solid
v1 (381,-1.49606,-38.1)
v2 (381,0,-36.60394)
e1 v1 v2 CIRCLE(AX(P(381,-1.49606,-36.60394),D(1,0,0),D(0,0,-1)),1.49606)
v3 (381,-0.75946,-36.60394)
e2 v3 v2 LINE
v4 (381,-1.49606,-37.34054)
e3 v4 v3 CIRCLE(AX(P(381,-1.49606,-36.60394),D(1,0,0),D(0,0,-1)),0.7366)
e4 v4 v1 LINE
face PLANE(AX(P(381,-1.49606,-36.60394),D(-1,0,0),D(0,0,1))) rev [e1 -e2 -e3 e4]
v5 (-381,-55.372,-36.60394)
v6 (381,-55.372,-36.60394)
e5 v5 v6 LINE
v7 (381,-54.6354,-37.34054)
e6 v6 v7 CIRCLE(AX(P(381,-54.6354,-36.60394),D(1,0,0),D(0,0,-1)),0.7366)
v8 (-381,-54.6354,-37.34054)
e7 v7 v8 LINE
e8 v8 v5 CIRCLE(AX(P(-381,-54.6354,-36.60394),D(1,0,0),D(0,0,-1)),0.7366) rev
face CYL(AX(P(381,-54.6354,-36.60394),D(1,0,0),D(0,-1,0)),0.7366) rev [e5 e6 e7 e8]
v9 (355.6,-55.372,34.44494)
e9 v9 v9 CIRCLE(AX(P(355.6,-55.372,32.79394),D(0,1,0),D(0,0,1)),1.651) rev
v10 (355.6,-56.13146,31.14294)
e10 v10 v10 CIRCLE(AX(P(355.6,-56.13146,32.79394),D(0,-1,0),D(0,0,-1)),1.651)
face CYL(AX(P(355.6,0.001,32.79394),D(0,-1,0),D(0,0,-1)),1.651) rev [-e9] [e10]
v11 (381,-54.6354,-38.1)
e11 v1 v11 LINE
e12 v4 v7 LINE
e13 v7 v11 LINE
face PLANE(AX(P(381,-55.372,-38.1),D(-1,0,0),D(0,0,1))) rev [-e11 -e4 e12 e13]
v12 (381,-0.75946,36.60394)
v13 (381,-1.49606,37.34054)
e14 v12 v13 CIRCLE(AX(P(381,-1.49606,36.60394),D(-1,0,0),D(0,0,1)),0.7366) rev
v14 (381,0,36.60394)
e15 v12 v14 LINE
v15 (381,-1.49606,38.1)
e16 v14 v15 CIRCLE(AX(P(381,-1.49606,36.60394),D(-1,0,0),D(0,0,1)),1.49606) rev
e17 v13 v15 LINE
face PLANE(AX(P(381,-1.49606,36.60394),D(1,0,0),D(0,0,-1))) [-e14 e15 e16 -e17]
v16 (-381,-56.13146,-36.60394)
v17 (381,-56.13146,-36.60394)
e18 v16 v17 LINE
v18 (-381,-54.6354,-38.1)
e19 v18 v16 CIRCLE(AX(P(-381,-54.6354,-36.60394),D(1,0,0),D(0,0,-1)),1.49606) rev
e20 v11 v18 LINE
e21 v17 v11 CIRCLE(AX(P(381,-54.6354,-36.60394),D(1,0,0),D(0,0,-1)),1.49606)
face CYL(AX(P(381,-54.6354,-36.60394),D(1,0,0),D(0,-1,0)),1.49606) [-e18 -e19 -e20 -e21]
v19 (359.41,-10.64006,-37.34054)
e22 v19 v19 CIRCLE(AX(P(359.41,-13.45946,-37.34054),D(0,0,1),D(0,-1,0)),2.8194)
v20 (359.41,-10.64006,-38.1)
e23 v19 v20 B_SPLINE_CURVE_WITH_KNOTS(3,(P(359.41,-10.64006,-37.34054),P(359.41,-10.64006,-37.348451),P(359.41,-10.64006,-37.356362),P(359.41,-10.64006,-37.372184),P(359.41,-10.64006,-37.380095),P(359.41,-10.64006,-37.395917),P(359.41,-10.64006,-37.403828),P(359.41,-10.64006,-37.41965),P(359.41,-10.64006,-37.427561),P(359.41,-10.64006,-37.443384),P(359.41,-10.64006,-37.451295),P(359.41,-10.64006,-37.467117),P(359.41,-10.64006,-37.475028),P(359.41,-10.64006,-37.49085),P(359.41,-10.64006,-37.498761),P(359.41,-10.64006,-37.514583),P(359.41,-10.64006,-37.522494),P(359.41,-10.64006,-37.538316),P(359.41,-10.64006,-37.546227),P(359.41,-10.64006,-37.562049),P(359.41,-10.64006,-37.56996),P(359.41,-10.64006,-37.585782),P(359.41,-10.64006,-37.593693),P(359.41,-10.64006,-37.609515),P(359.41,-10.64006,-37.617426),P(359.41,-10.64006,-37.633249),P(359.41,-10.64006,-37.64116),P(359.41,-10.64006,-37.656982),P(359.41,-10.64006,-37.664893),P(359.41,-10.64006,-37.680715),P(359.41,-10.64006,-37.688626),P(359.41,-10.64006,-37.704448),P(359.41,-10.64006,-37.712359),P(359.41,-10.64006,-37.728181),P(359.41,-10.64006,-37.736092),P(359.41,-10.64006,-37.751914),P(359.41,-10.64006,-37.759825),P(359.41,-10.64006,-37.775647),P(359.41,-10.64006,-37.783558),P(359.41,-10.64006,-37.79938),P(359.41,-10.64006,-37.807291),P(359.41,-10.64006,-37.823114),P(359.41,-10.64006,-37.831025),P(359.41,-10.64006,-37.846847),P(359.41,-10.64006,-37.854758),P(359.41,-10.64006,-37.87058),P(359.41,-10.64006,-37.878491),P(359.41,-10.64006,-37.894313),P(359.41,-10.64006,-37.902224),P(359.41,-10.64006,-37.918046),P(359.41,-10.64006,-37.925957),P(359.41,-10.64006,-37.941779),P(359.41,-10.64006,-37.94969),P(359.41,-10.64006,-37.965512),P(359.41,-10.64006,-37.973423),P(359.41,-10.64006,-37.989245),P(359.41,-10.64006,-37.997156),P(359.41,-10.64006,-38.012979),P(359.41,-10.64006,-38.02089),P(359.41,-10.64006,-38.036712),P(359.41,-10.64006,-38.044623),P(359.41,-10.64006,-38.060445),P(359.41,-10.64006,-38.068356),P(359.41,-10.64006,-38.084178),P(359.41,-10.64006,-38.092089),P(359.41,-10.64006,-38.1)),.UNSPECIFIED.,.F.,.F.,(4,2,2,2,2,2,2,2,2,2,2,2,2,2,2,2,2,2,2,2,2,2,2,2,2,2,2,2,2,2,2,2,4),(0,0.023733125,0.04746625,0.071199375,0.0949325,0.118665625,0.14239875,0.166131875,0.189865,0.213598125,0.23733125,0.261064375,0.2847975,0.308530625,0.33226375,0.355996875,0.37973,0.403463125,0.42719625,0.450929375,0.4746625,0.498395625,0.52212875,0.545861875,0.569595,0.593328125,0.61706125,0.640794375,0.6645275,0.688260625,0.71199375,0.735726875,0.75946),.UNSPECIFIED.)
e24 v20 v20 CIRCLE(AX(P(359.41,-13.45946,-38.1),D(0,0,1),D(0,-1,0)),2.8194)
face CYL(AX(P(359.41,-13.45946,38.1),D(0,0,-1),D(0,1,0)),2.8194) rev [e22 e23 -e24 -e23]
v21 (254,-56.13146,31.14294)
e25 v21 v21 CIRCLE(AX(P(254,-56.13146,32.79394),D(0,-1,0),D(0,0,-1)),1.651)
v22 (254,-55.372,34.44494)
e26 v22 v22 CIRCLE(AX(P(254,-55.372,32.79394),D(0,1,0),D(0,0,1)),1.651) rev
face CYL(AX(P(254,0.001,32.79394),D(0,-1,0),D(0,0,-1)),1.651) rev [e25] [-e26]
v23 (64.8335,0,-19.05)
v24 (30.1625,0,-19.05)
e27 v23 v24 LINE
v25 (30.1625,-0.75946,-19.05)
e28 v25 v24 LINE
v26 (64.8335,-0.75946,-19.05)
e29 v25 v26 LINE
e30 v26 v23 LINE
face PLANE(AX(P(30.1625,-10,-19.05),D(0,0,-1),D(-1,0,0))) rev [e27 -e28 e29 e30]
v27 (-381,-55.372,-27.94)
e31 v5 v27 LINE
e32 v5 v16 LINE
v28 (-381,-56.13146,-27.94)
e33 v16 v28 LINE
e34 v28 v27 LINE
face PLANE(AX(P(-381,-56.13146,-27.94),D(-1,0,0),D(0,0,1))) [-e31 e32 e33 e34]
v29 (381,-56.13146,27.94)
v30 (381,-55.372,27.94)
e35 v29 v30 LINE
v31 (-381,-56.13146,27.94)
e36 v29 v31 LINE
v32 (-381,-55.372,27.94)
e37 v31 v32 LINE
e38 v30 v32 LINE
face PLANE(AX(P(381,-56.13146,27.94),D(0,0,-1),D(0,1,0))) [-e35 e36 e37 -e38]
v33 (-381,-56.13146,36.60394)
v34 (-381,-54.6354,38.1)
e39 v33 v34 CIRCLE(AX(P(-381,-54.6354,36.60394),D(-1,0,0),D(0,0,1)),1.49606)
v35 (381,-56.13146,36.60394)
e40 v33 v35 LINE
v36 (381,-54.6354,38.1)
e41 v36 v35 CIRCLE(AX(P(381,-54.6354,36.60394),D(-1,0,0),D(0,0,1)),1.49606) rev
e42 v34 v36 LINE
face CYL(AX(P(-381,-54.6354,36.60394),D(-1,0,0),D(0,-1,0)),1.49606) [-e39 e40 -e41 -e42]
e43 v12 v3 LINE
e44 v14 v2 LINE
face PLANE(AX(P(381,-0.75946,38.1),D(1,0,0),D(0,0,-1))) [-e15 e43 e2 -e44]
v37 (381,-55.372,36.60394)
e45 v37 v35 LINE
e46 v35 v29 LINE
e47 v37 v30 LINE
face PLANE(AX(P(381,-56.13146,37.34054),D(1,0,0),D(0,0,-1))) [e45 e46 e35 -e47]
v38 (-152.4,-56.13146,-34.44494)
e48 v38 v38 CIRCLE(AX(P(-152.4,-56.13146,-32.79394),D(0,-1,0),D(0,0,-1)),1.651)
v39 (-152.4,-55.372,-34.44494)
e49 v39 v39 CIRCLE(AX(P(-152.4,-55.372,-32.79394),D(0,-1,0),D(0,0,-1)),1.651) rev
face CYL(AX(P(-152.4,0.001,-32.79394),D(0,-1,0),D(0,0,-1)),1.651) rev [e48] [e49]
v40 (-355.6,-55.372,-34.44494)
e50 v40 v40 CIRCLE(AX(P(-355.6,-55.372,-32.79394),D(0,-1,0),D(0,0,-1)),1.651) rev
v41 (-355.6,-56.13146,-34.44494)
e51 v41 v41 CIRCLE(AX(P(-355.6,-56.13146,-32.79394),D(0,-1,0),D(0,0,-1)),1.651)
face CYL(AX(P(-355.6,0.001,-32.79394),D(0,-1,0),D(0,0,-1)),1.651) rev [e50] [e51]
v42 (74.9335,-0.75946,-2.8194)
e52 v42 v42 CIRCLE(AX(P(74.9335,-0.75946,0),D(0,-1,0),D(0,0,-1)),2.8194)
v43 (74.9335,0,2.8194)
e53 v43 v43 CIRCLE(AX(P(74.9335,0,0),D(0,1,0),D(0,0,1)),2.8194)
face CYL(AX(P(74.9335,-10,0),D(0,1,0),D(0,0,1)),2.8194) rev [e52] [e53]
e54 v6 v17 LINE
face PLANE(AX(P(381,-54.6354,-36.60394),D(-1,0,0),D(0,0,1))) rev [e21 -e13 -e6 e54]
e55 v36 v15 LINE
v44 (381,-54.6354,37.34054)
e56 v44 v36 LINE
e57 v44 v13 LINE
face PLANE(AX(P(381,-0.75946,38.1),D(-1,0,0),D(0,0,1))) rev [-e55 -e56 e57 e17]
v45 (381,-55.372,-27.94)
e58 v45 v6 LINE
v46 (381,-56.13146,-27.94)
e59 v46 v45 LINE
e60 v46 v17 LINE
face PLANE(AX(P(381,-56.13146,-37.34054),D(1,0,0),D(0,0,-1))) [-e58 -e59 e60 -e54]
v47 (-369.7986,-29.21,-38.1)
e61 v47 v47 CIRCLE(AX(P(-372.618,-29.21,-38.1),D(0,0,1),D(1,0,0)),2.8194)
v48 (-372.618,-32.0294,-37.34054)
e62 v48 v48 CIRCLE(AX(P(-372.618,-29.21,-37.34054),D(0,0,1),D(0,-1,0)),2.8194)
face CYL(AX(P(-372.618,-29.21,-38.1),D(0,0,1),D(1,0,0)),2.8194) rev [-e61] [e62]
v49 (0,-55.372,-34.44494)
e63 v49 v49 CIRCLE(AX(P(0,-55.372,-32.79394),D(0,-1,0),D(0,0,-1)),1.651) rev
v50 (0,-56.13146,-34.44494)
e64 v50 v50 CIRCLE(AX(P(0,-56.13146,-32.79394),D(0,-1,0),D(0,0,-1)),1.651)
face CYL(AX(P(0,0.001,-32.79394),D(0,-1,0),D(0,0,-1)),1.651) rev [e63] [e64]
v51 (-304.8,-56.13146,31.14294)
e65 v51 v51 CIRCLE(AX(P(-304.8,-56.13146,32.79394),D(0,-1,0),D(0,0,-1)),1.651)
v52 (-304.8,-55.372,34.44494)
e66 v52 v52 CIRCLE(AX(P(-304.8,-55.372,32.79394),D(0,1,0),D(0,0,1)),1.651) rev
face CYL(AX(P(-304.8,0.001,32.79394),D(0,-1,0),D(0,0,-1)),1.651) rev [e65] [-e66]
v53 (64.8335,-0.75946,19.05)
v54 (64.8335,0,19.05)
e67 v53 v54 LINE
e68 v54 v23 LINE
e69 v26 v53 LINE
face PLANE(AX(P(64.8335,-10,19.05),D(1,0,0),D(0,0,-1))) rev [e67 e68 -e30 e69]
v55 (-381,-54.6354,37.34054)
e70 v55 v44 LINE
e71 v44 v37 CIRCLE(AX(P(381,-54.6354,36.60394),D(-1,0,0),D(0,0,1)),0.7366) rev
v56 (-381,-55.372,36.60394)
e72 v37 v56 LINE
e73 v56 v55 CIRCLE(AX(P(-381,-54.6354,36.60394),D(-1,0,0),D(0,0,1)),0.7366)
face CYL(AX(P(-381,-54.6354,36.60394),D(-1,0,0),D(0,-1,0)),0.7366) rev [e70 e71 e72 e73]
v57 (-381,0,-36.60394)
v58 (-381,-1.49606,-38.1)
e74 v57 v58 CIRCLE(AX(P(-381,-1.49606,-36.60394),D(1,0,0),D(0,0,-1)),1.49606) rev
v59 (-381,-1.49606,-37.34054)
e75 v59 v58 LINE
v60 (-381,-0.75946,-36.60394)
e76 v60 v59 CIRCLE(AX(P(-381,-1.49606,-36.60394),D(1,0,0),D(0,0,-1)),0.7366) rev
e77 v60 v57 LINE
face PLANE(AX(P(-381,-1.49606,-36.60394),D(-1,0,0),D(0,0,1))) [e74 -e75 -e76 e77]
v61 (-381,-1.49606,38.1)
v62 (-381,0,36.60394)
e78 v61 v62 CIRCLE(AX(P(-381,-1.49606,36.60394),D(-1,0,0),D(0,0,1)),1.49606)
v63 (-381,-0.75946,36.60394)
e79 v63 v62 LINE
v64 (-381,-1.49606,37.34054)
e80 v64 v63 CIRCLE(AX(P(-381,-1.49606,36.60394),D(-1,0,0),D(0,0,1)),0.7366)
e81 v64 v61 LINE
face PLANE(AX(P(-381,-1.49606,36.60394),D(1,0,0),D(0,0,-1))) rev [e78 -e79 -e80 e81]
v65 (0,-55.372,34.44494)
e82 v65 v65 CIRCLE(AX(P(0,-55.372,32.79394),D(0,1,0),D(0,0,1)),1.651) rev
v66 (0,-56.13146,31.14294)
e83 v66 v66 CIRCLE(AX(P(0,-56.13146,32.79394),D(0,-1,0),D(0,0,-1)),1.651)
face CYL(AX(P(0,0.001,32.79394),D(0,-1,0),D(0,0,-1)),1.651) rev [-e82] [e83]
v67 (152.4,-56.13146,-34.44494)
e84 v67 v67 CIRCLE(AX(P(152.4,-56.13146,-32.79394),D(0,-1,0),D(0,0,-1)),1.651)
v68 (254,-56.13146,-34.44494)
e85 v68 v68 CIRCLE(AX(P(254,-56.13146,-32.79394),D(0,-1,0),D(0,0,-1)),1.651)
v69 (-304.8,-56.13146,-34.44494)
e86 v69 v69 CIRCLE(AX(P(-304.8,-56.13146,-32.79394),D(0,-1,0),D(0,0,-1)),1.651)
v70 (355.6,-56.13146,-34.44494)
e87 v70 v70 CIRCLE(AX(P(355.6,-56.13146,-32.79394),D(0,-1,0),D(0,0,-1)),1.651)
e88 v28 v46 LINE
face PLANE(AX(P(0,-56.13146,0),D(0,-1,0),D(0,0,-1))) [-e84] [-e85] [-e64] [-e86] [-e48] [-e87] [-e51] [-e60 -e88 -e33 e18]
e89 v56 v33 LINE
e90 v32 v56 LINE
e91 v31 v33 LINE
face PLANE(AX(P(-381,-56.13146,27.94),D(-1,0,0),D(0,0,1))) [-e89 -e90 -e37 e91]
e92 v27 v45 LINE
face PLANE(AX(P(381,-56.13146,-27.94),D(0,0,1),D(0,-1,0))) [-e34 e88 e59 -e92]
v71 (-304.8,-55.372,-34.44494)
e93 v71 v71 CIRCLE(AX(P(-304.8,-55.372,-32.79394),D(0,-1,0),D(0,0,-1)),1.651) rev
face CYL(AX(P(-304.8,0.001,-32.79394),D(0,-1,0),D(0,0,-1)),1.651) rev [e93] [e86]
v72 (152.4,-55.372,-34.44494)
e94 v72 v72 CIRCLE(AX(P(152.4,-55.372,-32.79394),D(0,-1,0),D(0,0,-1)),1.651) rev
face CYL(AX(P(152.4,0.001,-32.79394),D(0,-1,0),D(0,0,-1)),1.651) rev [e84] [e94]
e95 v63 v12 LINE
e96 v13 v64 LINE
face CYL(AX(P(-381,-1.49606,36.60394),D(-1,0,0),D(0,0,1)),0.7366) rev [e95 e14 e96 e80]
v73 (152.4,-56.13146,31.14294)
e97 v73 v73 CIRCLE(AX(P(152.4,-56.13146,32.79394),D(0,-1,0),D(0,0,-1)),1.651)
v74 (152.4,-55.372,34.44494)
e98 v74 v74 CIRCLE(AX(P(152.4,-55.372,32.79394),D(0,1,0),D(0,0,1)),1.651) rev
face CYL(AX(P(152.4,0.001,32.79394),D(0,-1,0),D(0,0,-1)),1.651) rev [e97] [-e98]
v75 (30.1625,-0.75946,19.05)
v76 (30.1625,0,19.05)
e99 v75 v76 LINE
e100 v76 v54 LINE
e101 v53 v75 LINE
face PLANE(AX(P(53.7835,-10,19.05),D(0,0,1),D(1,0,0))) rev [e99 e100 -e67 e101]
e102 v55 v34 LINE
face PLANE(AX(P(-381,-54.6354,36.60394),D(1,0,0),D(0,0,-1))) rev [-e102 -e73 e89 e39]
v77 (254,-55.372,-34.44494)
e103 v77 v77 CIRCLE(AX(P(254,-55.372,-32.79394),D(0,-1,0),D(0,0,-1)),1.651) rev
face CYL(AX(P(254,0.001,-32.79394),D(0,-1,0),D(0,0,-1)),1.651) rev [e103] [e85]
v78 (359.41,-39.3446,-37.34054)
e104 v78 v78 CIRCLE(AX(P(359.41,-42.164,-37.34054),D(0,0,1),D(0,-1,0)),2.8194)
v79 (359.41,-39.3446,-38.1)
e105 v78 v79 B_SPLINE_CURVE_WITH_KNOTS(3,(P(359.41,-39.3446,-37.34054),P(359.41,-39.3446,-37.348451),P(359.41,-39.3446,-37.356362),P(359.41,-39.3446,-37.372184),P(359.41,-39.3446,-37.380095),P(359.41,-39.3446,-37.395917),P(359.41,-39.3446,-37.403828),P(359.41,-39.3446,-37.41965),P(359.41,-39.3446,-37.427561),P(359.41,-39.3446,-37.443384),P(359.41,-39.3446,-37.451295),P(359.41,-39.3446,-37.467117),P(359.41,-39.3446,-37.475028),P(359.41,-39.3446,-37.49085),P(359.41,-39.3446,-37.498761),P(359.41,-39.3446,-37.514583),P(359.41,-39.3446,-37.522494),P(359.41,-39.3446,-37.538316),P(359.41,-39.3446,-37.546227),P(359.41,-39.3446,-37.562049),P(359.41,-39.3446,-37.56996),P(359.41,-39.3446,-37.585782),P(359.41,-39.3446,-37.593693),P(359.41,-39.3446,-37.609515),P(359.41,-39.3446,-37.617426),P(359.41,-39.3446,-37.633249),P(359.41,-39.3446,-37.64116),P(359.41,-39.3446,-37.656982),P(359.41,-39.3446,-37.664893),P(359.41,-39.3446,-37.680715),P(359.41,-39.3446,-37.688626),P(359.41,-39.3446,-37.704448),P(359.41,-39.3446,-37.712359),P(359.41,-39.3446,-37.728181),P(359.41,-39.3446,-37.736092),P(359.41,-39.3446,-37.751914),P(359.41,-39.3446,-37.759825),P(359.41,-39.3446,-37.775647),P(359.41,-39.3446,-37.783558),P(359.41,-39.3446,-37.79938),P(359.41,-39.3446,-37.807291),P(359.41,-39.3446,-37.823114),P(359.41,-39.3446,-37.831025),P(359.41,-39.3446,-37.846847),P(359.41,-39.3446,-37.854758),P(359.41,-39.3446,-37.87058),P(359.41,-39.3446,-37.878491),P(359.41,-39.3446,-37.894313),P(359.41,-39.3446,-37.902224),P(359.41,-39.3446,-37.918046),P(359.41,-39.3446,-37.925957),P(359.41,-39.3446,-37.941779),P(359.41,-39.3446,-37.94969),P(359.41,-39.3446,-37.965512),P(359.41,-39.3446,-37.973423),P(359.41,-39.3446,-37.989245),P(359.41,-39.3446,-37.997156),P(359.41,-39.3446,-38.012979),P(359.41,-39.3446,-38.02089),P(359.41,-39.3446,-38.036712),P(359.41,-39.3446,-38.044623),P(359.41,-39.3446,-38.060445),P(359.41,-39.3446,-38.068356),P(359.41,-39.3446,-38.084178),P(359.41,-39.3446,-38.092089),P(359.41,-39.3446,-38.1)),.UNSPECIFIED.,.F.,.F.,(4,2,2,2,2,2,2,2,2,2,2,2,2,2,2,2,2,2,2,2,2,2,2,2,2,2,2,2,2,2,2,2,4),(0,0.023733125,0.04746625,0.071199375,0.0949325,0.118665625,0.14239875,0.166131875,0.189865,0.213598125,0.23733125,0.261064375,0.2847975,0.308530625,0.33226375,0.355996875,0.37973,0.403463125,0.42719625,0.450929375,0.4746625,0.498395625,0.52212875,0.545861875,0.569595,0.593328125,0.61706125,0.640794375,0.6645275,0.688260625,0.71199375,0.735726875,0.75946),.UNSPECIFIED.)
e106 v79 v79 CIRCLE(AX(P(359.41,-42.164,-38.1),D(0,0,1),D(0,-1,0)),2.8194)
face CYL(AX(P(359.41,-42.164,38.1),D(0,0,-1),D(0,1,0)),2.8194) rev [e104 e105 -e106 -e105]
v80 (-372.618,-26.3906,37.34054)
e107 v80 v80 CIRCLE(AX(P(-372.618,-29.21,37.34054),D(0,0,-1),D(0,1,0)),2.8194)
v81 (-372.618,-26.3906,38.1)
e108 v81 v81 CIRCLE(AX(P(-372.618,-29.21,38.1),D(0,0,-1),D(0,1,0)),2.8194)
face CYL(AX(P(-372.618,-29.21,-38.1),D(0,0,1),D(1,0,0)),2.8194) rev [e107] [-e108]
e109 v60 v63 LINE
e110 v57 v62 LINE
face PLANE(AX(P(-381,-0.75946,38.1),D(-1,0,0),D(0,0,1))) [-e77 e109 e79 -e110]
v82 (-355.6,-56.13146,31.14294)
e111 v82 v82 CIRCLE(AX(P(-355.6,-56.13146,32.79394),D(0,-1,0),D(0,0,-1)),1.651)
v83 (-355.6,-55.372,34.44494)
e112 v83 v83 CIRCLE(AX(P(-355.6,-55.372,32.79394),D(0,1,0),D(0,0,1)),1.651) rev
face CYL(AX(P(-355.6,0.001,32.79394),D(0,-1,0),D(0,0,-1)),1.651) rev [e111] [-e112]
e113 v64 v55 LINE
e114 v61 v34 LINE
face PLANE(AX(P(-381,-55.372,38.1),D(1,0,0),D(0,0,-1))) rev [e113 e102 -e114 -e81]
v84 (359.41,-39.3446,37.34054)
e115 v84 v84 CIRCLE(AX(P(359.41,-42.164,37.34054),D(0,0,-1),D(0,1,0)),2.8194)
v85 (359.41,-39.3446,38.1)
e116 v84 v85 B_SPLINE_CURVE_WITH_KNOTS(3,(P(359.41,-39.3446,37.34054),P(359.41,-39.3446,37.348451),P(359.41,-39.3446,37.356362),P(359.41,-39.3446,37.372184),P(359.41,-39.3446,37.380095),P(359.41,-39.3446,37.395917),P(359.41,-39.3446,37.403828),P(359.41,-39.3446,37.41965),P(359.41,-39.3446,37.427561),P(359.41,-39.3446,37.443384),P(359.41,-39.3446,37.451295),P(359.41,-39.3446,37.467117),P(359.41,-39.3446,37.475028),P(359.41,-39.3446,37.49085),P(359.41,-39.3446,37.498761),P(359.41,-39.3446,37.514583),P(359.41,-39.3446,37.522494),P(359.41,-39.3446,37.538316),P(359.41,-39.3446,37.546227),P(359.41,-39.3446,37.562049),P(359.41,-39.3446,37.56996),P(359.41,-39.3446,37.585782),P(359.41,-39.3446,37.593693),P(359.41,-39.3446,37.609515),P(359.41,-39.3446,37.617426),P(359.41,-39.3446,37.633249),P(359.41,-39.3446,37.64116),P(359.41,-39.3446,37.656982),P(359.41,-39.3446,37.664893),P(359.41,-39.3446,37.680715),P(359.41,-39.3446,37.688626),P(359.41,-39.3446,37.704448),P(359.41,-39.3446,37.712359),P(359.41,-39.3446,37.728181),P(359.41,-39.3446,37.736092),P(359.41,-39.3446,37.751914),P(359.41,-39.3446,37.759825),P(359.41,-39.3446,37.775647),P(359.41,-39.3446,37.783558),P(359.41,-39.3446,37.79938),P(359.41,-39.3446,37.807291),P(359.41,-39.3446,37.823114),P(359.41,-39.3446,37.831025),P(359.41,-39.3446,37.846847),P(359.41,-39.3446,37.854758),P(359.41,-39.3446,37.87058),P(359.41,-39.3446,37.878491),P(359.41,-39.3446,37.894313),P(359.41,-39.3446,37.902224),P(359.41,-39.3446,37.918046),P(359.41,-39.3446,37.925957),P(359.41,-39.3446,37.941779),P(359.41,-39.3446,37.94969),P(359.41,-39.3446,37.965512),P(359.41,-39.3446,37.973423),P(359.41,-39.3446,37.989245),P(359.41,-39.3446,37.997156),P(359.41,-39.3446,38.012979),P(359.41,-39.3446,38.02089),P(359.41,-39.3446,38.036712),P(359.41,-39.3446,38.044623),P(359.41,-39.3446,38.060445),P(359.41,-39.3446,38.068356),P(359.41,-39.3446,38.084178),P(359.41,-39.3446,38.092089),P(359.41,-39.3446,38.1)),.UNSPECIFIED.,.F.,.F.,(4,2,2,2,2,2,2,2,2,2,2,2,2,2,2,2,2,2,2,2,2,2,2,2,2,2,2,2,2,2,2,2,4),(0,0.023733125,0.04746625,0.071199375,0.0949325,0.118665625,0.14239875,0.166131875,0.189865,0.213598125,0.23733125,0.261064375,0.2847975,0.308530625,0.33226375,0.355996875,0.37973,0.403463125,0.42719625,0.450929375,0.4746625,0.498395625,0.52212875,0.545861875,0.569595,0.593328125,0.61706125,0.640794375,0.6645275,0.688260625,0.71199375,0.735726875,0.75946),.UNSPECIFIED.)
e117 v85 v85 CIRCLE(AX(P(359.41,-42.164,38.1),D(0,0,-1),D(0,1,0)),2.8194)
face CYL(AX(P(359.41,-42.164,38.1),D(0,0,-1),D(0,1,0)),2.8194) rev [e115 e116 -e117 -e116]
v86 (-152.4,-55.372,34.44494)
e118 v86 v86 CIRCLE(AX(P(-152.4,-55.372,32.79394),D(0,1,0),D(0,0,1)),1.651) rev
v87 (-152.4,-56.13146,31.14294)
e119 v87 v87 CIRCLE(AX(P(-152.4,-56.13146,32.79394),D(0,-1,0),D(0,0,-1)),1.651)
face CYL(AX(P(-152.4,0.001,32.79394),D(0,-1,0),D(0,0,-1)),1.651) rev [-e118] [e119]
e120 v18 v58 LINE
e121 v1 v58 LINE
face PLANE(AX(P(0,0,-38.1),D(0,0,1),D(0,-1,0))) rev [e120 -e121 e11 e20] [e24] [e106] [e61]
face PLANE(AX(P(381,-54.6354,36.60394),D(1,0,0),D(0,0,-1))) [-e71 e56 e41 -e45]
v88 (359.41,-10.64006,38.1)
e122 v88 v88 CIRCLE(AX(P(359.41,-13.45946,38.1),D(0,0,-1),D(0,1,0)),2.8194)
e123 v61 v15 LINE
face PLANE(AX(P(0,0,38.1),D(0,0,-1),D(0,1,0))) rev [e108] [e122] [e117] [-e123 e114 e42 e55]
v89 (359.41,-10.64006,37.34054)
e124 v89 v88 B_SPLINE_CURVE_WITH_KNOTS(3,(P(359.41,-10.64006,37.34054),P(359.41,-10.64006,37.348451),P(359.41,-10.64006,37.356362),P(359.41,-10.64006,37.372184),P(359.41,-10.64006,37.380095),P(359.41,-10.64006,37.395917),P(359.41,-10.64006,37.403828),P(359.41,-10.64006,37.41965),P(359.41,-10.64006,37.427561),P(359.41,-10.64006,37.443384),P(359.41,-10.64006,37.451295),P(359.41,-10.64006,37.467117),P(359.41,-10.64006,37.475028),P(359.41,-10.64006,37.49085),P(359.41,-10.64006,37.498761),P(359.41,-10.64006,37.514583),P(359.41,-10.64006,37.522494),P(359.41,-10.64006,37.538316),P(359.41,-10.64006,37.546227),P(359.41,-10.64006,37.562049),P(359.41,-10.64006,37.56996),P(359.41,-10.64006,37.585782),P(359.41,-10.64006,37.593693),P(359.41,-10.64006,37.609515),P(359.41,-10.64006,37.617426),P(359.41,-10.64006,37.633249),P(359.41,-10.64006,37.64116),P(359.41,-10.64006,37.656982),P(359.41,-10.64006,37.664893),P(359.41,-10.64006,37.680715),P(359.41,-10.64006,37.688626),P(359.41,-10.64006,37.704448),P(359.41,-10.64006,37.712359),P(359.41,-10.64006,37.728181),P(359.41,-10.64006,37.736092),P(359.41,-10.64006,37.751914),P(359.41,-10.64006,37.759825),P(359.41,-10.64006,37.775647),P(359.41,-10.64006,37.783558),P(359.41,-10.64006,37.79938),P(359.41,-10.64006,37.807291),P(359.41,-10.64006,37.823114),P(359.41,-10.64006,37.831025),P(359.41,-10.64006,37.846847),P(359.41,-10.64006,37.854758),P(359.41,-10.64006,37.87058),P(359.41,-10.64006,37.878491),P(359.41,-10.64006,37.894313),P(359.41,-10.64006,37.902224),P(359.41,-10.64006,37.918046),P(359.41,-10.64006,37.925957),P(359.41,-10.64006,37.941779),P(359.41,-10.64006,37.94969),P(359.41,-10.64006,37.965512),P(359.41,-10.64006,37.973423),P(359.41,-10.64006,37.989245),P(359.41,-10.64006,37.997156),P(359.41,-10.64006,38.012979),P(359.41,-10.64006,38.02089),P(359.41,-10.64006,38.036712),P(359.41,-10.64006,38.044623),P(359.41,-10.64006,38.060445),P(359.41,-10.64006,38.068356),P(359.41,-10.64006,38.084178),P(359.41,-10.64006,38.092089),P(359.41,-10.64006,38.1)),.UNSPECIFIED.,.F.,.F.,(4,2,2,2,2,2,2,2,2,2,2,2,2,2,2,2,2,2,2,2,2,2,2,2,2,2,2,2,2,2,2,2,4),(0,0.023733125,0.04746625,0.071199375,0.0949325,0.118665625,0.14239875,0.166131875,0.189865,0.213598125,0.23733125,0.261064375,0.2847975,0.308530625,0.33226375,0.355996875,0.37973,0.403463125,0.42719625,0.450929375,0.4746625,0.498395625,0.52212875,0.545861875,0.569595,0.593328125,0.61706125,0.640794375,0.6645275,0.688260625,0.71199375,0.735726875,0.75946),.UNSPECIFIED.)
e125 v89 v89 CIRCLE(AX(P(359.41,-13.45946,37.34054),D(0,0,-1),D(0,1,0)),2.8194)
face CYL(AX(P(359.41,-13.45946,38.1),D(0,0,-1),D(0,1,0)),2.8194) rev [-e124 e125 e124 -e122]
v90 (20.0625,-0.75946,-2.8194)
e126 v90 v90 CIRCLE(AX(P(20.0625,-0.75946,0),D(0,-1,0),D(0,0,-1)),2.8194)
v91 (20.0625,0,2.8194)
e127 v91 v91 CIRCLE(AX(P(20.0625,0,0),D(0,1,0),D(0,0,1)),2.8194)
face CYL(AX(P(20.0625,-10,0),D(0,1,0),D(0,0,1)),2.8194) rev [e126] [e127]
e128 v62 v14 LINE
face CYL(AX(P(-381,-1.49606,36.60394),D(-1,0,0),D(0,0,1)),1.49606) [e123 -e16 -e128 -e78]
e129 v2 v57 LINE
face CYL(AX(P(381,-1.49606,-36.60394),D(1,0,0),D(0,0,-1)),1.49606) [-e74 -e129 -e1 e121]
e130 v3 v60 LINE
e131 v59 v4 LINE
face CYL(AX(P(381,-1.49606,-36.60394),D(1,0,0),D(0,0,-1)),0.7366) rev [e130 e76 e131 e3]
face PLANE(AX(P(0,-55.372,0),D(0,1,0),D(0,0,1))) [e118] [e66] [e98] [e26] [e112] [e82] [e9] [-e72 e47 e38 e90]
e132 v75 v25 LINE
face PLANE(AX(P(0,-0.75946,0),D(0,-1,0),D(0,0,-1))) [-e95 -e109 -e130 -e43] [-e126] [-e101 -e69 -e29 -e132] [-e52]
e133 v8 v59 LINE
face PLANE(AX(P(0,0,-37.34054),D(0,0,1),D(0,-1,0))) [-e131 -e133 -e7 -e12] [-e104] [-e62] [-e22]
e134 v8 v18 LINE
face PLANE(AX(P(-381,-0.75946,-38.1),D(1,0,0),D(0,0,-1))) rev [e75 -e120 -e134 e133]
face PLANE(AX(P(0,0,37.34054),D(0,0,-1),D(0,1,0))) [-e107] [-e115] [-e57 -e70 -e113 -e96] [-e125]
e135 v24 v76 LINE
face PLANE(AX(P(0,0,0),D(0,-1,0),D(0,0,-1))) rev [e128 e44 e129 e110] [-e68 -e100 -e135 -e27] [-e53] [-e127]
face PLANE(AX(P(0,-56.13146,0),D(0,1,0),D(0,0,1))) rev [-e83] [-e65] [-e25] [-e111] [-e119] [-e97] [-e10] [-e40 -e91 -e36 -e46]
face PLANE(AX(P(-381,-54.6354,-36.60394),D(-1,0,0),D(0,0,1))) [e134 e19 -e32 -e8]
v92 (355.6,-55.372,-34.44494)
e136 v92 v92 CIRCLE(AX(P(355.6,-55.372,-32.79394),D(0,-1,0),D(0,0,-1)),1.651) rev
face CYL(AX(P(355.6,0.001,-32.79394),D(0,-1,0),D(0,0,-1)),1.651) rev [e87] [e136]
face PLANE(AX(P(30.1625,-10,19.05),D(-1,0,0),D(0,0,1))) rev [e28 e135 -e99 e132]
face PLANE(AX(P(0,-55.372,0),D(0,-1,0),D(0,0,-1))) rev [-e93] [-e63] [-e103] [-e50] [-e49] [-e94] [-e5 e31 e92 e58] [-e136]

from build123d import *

# Parameters (mm, degrees)
SKETCH1_W                      = 762
SKETCH1_H                      = 76.2
BASE_FLANGE1_DEPTH             = 0.75946
CUT_EXTRUDE1_DEPTH             = 10
SKETCH7_R                      = 2.8194
CUT_EXTRUDE2_DEPTH             = 10
EDGE_FLANGE1_STRIP_W           = 4.51104
EDGE_FLANGE1_STRIP_H           = 0.75946
EDGE_FLANGE1_STRIP_CUT_DEPTH   = 762
EDGE_FLANGE1_STRIP_2_W         = 4.51104
EDGE_FLANGE1_STRIP_2_H         = 0.75946
EDGE_FLANGE1_STRIP_CUT_2_DEPTH = 762
EDGE_FLANGE1_DEPTH             = 762
EDGE_FLANGE1_BEND_DEPTH        = 762
CUT_EXTRUDE4_DEPTH             = 393.47101598
CUT_EXTRUDE4_DEPTH_BACK        = 393.47101598
SKETCH42_R                     = 2.8194
EDGE_FLANGE2_STRIP_W           = 4.51104
EDGE_FLANGE2_STRIP_H           = 0.75946
EDGE_FLANGE2_STRIP_CUT_DEPTH   = 762
EDGE_FLANGE2_STRIP_2_W         = 4.51104
EDGE_FLANGE2_STRIP_2_H         = 0.75946
EDGE_FLANGE2_STRIP_CUT_2_DEPTH = 762
EDGE_FLANGE2_DEPTH             = 762
EDGE_FLANGE2_BEND_DEPTH        = 762
CUT_EXTRUDE5_REACH             = 388.993
SKETCH49_R                     = 1.651
CUT_EXTRUDE6_DEPTH             = 393.578884814
CUT_EXTRUDE6_DEPTH_BACK        = 393.578884814
SKETCH50_R                     = 2.8194


# Sheet-metal steps are written as plain solids
with BuildPart() as part:
    # Sketch1 → Base-Flange1 (new body)
    with BuildSketch(Plane(origin=(0, 0, 0), x_dir=(1, 0, 0), z_dir=(0, 1, 0))):
        Rectangle(SKETCH1_W, SKETCH1_H)
    extrude(amount=-BASE_FLANGE1_DEPTH)

    # Sketch6 → Cut-Extrude1 (cut)
    with BuildSketch(Plane(origin=(0, 0, 0), x_dir=(1, 0, 0), z_dir=(0, 1, 0))):
        Polygon((53.7835, 19.05), (64.8335, 19.05), (64.8335, -19.05), (53.7835, -19.05), (30.1625, -19.05), (30.1625, 19.05), align=None)
    extrude(amount=-CUT_EXTRUDE1_DEPTH, mode=Mode.SUBTRACT)

    # Sketch7 → Cut-Extrude2 (cut)
    with BuildSketch(Plane(origin=(0, 0, 0), x_dir=(1, 0, 0), z_dir=(0, 1, 0))):
        with Locations(Location((20.0625, 0, 0), (0, 0, 270))):
            Circle(SKETCH7_R)
        with Locations(Location((74.9335, 0, 0), (0, 0, 270))):
            Circle(SKETCH7_R)
    extrude(amount=-CUT_EXTRUDE2_DEPTH, mode=Mode.SUBTRACT)

    # Edge-Flange1 strip (across the edge) → Edge-Flange1 strip cut (cut)
    with BuildSketch(Plane(origin=(-381, -0.75946, -38.1), x_dir=(0, 0, 1), z_dir=(1, 0, 0))):
        with Locations((-0.75946, -0.37973)):
            Rectangle(EDGE_FLANGE1_STRIP_W, EDGE_FLANGE1_STRIP_H)
    extrude(amount=EDGE_FLANGE1_STRIP_CUT_DEPTH, mode=Mode.SUBTRACT)

    # Edge-Flange1 strip 2 (across the edge) → Edge-Flange1 strip cut 2 (cut)
    with BuildSketch(Plane(origin=(381, -0.75946, 38.1), x_dir=(0, 0, -1), z_dir=(-1, 0, 0))):
        with Locations((-0.75946, -0.37973)):
            Rectangle(EDGE_FLANGE1_STRIP_2_W, EDGE_FLANGE1_STRIP_2_H)
    extrude(amount=EDGE_FLANGE1_STRIP_CUT_2_DEPTH, mode=Mode.SUBTRACT)

    # Edge-Flange1 section (across the edge) → Edge-Flange1 (add)
    with BuildSketch(Plane(origin=(-381, -0.75946, -38.1), x_dir=(0, 0, 1), z_dir=(1, 0, 0))):
        with BuildLine():
            Line((0, 0.7366), (0, 54.61254))
            Line((0, 54.61254), (0.75946, 54.61254))
            Line((0.75946, 54.61254), (0.75946, 0.7366))
            ThreePointArc((0.75946, 0.7366), (0.975205145, 0.215745145), (1.49606, 0))
            Line((1.49606, 0), (1.49606, -0.75946))
            ThreePointArc((1.49606, -0.75946), (0.438185829, -0.321274171), (0, 0.7366))
        make_face()
    extrude(amount=EDGE_FLANGE1_DEPTH)

    # Edge-Flange1 section 2 (across the edge) → Edge-Flange1 bend (add)
    with BuildSketch(Plane(origin=(381, -0.75946, 38.1), x_dir=(0, 0, -1), z_dir=(-1, 0, 0))):
        with BuildLine():
            Line((0, 0.7366), (0, 54.61254))
            Line((0, 54.61254), (0.75946, 54.61254))
            Line((0.75946, 54.61254), (0.75946, 0.7366))
            ThreePointArc((0.75946, 0.7366), (0.975205145, 0.215745145), (1.49606, 0))
            Line((1.49606, 0), (1.49606, -0.75946))
            ThreePointArc((1.49606, -0.75946), (0.438185829, -0.321274171), (0, 0.7366))
        make_face()
    extrude(amount=EDGE_FLANGE1_BEND_DEPTH)

    # Sketch42 → Cut-Extrude4 (cut, two sides: drawn at the far end of the back side and taken through both)
    with BuildSketch(Plane(origin=(0, 0, -38.1), x_dir=(-1, 0, 0), z_dir=(0, 0, -1)).offset(-CUT_EXTRUDE4_DEPTH_BACK)):
        with Locations(Location((-359.41, -13.45946, 0), (0, 0, 90))):
            Circle(SKETCH42_R)
        with Locations(Location((-359.41, -42.164, 0), (0, 0, 90))):
            Circle(SKETCH42_R)
    extrude(amount=CUT_EXTRUDE4_DEPTH + CUT_EXTRUDE4_DEPTH_BACK, mode=Mode.SUBTRACT)

    # Edge-Flange2 strip (across the edge) → Edge-Flange2 strip cut (cut)
    with BuildSketch(Plane(origin=(-381, -55.372, -37.34054), x_dir=(0, 1, 0), z_dir=(1, 0, 0))):
        with Locations((-1.51892, -0.37973)):
            Rectangle(EDGE_FLANGE2_STRIP_W, EDGE_FLANGE2_STRIP_H)
    extrude(amount=EDGE_FLANGE2_STRIP_CUT_DEPTH, mode=Mode.SUBTRACT)

    # Edge-Flange2 strip 2 (across the edge) → Edge-Flange2 strip cut 2 (cut)
    with BuildSketch(Plane(origin=(381, -55.372, 37.34054), x_dir=(0, 1, 0), z_dir=(-1, 0, 0))):
        with Locations((-1.51892, -0.37973)):
            Rectangle(EDGE_FLANGE2_STRIP_2_W, EDGE_FLANGE2_STRIP_2_H)
    extrude(amount=EDGE_FLANGE2_STRIP_CUT_2_DEPTH, mode=Mode.SUBTRACT)

    # Edge-Flange2 section (across the edge) → Edge-Flange2 (add)
    with BuildSketch(Plane(origin=(-381, -55.372, -37.34054), x_dir=(0, 1, 0), z_dir=(1, 0, 0))):
        with BuildLine():
            Line((-0.75946, 0.7366), (-0.75946, 9.40054))
            Line((-0.75946, 9.40054), (0, 9.40054))
            Line((0, 9.40054), (0, 0.7366))
            ThreePointArc((0, 0.7366), (0.215745145, 0.215745145), (0.7366, 0))
            Line((0.7366, 0), (0.7366, -0.75946))
            ThreePointArc((0.7366, -0.75946), (-0.321274171, -0.321274171), (-0.75946, 0.7366))
        make_face()
    extrude(amount=EDGE_FLANGE2_DEPTH)

    # Edge-Flange2 section 2 (across the edge) → Edge-Flange2 bend (add)
    with BuildSketch(Plane(origin=(381, -55.372, 37.34054), x_dir=(0, 1, 0), z_dir=(-1, 0, 0))):
        with BuildLine():
            Line((-0.75946, 0.7366), (-0.75946, 9.40054))
            Line((-0.75946, 9.40054), (0, 9.40054))
            Line((0, 9.40054), (0, 0.7366))
            ThreePointArc((0, 0.7366), (0.215745145, 0.215745145), (0.7366, 0))
            Line((0.7366, 0), (0.7366, -0.75946))
            ThreePointArc((0.7366, -0.75946), (-0.321274171, -0.321274171), (-0.75946, 0.7366))
        make_face()
    extrude(amount=EDGE_FLANGE2_BEND_DEPTH)

    # Sketch49 → Cut-Extrude5 (cut, up to next)
    with BuildSketch(Plane.XZ.offset(56.13146), mode=Mode.PRIVATE) as cut_extrude5_sk1:
        with Locations(Location((254, -32.79394, 0), (0, 0, 270))):
            Circle(SKETCH49_R)
    cut_extrude5_tool1 = extrude(cut_extrude5_sk1.sketch, amount=-CUT_EXTRUDE5_REACH, mode=Mode.PRIVATE) & part.part
    # Sketch49 → Cut-Extrude5 (cut, up to next)
    with BuildSketch(Plane.XZ.offset(56.13146), mode=Mode.PRIVATE) as cut_extrude5_sk2:
        with Locations(Location((254, 32.79394, 0), (0, 0, 270))):
            Circle(SKETCH49_R)
    cut_extrude5_tool2 = extrude(cut_extrude5_sk2.sketch, amount=-CUT_EXTRUDE5_REACH, mode=Mode.PRIVATE) & part.part
    # Sketch49 → Cut-Extrude5 (cut, up to next)
    with BuildSketch(Plane.XZ.offset(56.13146), mode=Mode.PRIVATE) as cut_extrude5_sk3:
        with Locations(Location((0, 32.79394, 0), (0, 0, 270))):
            Circle(SKETCH49_R)
    cut_extrude5_tool3 = extrude(cut_extrude5_sk3.sketch, amount=-CUT_EXTRUDE5_REACH, mode=Mode.PRIVATE) & part.part
    # Sketch49 → Cut-Extrude5 (cut, up to next)
    with BuildSketch(Plane.XZ.offset(56.13146), mode=Mode.PRIVATE) as cut_extrude5_sk4:
        with Locations(Location((0, -32.79394, 0), (0, 0, 270))):
            Circle(SKETCH49_R)
    cut_extrude5_tool4 = extrude(cut_extrude5_sk4.sketch, amount=-CUT_EXTRUDE5_REACH, mode=Mode.PRIVATE) & part.part
    # Sketch49 → Cut-Extrude5 (cut, up to next)
    with BuildSketch(Plane.XZ.offset(56.13146), mode=Mode.PRIVATE) as cut_extrude5_sk5:
        with Locations(Location((-304.8, -32.79394, 0), (0, 0, 270))):
            Circle(SKETCH49_R)
    cut_extrude5_tool5 = extrude(cut_extrude5_sk5.sketch, amount=-CUT_EXTRUDE5_REACH, mode=Mode.PRIVATE) & part.part
    # Sketch49 → Cut-Extrude5 (cut, up to next)
    with BuildSketch(Plane.XZ.offset(56.13146), mode=Mode.PRIVATE) as cut_extrude5_sk6:
        with Locations(Location((-304.8, 32.79394, 0), (0, 0, 270))):
            Circle(SKETCH49_R)
    cut_extrude5_tool6 = extrude(cut_extrude5_sk6.sketch, amount=-CUT_EXTRUDE5_REACH, mode=Mode.PRIVATE) & part.part
    # Sketch49 → Cut-Extrude5 (cut, up to next)
    with BuildSketch(Plane.XZ.offset(56.13146), mode=Mode.PRIVATE) as cut_extrude5_sk7:
        with Locations(Location((-355.6, 32.79394, 0), (0, 0, 270))):
            Circle(SKETCH49_R)
    cut_extrude5_tool7 = extrude(cut_extrude5_sk7.sketch, amount=-CUT_EXTRUDE5_REACH, mode=Mode.PRIVATE) & part.part
    # Sketch49 → Cut-Extrude5 (cut, up to next)
    with BuildSketch(Plane.XZ.offset(56.13146), mode=Mode.PRIVATE) as cut_extrude5_sk8:
        with Locations(Location((-355.6, -32.79394, 0), (0, 0, 270))):
            Circle(SKETCH49_R)
    cut_extrude5_tool8 = extrude(cut_extrude5_sk8.sketch, amount=-CUT_EXTRUDE5_REACH, mode=Mode.PRIVATE) & part.part
    # Sketch49 → Cut-Extrude5 (cut, up to next)
    with BuildSketch(Plane.XZ.offset(56.13146), mode=Mode.PRIVATE) as cut_extrude5_sk9:
        with Locations(Location((355.6, -32.79394, 0), (0, 0, 270))):
            Circle(SKETCH49_R)
    cut_extrude5_tool9 = extrude(cut_extrude5_sk9.sketch, amount=-CUT_EXTRUDE5_REACH, mode=Mode.PRIVATE) & part.part
    # Sketch49 → Cut-Extrude5 (cut, up to next)
    with BuildSketch(Plane.XZ.offset(56.13146), mode=Mode.PRIVATE) as cut_extrude5_sk10:
        with Locations(Location((355.6, 32.79394, 0), (0, 0, 270))):
            Circle(SKETCH49_R)
    cut_extrude5_tool10 = extrude(cut_extrude5_sk10.sketch, amount=-CUT_EXTRUDE5_REACH, mode=Mode.PRIVATE) & part.part
    # Sketch49 → Cut-Extrude5 (cut, up to next)
    with BuildSketch(Plane.XZ.offset(56.13146), mode=Mode.PRIVATE) as cut_extrude5_sk11:
        with Locations(Location((152.4, 32.79394, 0), (0, 0, 270))):
            Circle(SKETCH49_R)
    cut_extrude5_tool11 = extrude(cut_extrude5_sk11.sketch, amount=-CUT_EXTRUDE5_REACH, mode=Mode.PRIVATE) & part.part
    # Sketch49 → Cut-Extrude5 (cut, up to next)
    with BuildSketch(Plane.XZ.offset(56.13146), mode=Mode.PRIVATE) as cut_extrude5_sk12:
        with Locations(Location((152.4, -32.79394, 0), (0, 0, 270))):
            Circle(SKETCH49_R)
    cut_extrude5_tool12 = extrude(cut_extrude5_sk12.sketch, amount=-CUT_EXTRUDE5_REACH, mode=Mode.PRIVATE) & part.part
    # Sketch49 → Cut-Extrude5 (cut, up to next)
    with BuildSketch(Plane.XZ.offset(56.13146), mode=Mode.PRIVATE) as cut_extrude5_sk13:
        with Locations(Location((-152.4, 32.79394, 0), (0, 0, 270))):
            Circle(SKETCH49_R)
    cut_extrude5_tool13 = extrude(cut_extrude5_sk13.sketch, amount=-CUT_EXTRUDE5_REACH, mode=Mode.PRIVATE) & part.part
    # Sketch49 → Cut-Extrude5 (cut, up to next)
    with BuildSketch(Plane.XZ.offset(56.13146), mode=Mode.PRIVATE) as cut_extrude5_sk14:
        with Locations(Location((-152.4, -32.79394, 0), (0, 0, 270))):
            Circle(SKETCH49_R)
    cut_extrude5_tool14 = extrude(cut_extrude5_sk14.sketch, amount=-CUT_EXTRUDE5_REACH, mode=Mode.PRIVATE) & part.part
    add(cut_extrude5_tool1.solids().sort_by_distance((254, -56.13146, -32.79394))[0], mode=Mode.SUBTRACT)
    add(cut_extrude5_tool2.solids().sort_by_distance((254, -56.13146, 32.79394))[0], mode=Mode.SUBTRACT)
    add(cut_extrude5_tool3.solids().sort_by_distance((0, -56.13146, 32.79394))[0], mode=Mode.SUBTRACT)
    add(cut_extrude5_tool4.solids().sort_by_distance((0, -56.13146, -32.79394))[0], mode=Mode.SUBTRACT)
    add(cut_extrude5_tool5.solids().sort_by_distance((-304.8, -56.13146, -32.79394))[0], mode=Mode.SUBTRACT)
    add(cut_extrude5_tool6.solids().sort_by_distance((-304.8, -56.13146, 32.79394))[0], mode=Mode.SUBTRACT)
    add(cut_extrude5_tool7.solids().sort_by_distance((-355.6, -56.13146, 32.79394))[0], mode=Mode.SUBTRACT)
    add(cut_extrude5_tool8.solids().sort_by_distance((-355.6, -56.13146, -32.79394))[0], mode=Mode.SUBTRACT)
    add(cut_extrude5_tool9.solids().sort_by_distance((355.6, -56.13146, -32.79394))[0], mode=Mode.SUBTRACT)
    add(cut_extrude5_tool10.solids().sort_by_distance((355.6, -56.13146, 32.79394))[0], mode=Mode.SUBTRACT)
    add(cut_extrude5_tool11.solids().sort_by_distance((152.4, -56.13146, 32.79394))[0], mode=Mode.SUBTRACT)
    add(cut_extrude5_tool12.solids().sort_by_distance((152.4, -56.13146, -32.79394))[0], mode=Mode.SUBTRACT)
    add(cut_extrude5_tool13.solids().sort_by_distance((-152.4, -56.13146, 32.79394))[0], mode=Mode.SUBTRACT)
    add(cut_extrude5_tool14.solids().sort_by_distance((-152.4, -56.13146, -32.79394))[0], mode=Mode.SUBTRACT)

    # Sketch50 → Cut-Extrude6 (cut, two sides: drawn at the far end of the back side and taken through both)
    with BuildSketch(Plane.XY.offset(38.1).offset(-CUT_EXTRUDE6_DEPTH_BACK)):
        with Locations((-372.618, -29.21)):
            Circle(SKETCH50_R)
    extrude(amount=CUT_EXTRUDE6_DEPTH + CUT_EXTRUDE6_DEPTH_BACK, mode=Mode.SUBTRACT)


solid = part.part
